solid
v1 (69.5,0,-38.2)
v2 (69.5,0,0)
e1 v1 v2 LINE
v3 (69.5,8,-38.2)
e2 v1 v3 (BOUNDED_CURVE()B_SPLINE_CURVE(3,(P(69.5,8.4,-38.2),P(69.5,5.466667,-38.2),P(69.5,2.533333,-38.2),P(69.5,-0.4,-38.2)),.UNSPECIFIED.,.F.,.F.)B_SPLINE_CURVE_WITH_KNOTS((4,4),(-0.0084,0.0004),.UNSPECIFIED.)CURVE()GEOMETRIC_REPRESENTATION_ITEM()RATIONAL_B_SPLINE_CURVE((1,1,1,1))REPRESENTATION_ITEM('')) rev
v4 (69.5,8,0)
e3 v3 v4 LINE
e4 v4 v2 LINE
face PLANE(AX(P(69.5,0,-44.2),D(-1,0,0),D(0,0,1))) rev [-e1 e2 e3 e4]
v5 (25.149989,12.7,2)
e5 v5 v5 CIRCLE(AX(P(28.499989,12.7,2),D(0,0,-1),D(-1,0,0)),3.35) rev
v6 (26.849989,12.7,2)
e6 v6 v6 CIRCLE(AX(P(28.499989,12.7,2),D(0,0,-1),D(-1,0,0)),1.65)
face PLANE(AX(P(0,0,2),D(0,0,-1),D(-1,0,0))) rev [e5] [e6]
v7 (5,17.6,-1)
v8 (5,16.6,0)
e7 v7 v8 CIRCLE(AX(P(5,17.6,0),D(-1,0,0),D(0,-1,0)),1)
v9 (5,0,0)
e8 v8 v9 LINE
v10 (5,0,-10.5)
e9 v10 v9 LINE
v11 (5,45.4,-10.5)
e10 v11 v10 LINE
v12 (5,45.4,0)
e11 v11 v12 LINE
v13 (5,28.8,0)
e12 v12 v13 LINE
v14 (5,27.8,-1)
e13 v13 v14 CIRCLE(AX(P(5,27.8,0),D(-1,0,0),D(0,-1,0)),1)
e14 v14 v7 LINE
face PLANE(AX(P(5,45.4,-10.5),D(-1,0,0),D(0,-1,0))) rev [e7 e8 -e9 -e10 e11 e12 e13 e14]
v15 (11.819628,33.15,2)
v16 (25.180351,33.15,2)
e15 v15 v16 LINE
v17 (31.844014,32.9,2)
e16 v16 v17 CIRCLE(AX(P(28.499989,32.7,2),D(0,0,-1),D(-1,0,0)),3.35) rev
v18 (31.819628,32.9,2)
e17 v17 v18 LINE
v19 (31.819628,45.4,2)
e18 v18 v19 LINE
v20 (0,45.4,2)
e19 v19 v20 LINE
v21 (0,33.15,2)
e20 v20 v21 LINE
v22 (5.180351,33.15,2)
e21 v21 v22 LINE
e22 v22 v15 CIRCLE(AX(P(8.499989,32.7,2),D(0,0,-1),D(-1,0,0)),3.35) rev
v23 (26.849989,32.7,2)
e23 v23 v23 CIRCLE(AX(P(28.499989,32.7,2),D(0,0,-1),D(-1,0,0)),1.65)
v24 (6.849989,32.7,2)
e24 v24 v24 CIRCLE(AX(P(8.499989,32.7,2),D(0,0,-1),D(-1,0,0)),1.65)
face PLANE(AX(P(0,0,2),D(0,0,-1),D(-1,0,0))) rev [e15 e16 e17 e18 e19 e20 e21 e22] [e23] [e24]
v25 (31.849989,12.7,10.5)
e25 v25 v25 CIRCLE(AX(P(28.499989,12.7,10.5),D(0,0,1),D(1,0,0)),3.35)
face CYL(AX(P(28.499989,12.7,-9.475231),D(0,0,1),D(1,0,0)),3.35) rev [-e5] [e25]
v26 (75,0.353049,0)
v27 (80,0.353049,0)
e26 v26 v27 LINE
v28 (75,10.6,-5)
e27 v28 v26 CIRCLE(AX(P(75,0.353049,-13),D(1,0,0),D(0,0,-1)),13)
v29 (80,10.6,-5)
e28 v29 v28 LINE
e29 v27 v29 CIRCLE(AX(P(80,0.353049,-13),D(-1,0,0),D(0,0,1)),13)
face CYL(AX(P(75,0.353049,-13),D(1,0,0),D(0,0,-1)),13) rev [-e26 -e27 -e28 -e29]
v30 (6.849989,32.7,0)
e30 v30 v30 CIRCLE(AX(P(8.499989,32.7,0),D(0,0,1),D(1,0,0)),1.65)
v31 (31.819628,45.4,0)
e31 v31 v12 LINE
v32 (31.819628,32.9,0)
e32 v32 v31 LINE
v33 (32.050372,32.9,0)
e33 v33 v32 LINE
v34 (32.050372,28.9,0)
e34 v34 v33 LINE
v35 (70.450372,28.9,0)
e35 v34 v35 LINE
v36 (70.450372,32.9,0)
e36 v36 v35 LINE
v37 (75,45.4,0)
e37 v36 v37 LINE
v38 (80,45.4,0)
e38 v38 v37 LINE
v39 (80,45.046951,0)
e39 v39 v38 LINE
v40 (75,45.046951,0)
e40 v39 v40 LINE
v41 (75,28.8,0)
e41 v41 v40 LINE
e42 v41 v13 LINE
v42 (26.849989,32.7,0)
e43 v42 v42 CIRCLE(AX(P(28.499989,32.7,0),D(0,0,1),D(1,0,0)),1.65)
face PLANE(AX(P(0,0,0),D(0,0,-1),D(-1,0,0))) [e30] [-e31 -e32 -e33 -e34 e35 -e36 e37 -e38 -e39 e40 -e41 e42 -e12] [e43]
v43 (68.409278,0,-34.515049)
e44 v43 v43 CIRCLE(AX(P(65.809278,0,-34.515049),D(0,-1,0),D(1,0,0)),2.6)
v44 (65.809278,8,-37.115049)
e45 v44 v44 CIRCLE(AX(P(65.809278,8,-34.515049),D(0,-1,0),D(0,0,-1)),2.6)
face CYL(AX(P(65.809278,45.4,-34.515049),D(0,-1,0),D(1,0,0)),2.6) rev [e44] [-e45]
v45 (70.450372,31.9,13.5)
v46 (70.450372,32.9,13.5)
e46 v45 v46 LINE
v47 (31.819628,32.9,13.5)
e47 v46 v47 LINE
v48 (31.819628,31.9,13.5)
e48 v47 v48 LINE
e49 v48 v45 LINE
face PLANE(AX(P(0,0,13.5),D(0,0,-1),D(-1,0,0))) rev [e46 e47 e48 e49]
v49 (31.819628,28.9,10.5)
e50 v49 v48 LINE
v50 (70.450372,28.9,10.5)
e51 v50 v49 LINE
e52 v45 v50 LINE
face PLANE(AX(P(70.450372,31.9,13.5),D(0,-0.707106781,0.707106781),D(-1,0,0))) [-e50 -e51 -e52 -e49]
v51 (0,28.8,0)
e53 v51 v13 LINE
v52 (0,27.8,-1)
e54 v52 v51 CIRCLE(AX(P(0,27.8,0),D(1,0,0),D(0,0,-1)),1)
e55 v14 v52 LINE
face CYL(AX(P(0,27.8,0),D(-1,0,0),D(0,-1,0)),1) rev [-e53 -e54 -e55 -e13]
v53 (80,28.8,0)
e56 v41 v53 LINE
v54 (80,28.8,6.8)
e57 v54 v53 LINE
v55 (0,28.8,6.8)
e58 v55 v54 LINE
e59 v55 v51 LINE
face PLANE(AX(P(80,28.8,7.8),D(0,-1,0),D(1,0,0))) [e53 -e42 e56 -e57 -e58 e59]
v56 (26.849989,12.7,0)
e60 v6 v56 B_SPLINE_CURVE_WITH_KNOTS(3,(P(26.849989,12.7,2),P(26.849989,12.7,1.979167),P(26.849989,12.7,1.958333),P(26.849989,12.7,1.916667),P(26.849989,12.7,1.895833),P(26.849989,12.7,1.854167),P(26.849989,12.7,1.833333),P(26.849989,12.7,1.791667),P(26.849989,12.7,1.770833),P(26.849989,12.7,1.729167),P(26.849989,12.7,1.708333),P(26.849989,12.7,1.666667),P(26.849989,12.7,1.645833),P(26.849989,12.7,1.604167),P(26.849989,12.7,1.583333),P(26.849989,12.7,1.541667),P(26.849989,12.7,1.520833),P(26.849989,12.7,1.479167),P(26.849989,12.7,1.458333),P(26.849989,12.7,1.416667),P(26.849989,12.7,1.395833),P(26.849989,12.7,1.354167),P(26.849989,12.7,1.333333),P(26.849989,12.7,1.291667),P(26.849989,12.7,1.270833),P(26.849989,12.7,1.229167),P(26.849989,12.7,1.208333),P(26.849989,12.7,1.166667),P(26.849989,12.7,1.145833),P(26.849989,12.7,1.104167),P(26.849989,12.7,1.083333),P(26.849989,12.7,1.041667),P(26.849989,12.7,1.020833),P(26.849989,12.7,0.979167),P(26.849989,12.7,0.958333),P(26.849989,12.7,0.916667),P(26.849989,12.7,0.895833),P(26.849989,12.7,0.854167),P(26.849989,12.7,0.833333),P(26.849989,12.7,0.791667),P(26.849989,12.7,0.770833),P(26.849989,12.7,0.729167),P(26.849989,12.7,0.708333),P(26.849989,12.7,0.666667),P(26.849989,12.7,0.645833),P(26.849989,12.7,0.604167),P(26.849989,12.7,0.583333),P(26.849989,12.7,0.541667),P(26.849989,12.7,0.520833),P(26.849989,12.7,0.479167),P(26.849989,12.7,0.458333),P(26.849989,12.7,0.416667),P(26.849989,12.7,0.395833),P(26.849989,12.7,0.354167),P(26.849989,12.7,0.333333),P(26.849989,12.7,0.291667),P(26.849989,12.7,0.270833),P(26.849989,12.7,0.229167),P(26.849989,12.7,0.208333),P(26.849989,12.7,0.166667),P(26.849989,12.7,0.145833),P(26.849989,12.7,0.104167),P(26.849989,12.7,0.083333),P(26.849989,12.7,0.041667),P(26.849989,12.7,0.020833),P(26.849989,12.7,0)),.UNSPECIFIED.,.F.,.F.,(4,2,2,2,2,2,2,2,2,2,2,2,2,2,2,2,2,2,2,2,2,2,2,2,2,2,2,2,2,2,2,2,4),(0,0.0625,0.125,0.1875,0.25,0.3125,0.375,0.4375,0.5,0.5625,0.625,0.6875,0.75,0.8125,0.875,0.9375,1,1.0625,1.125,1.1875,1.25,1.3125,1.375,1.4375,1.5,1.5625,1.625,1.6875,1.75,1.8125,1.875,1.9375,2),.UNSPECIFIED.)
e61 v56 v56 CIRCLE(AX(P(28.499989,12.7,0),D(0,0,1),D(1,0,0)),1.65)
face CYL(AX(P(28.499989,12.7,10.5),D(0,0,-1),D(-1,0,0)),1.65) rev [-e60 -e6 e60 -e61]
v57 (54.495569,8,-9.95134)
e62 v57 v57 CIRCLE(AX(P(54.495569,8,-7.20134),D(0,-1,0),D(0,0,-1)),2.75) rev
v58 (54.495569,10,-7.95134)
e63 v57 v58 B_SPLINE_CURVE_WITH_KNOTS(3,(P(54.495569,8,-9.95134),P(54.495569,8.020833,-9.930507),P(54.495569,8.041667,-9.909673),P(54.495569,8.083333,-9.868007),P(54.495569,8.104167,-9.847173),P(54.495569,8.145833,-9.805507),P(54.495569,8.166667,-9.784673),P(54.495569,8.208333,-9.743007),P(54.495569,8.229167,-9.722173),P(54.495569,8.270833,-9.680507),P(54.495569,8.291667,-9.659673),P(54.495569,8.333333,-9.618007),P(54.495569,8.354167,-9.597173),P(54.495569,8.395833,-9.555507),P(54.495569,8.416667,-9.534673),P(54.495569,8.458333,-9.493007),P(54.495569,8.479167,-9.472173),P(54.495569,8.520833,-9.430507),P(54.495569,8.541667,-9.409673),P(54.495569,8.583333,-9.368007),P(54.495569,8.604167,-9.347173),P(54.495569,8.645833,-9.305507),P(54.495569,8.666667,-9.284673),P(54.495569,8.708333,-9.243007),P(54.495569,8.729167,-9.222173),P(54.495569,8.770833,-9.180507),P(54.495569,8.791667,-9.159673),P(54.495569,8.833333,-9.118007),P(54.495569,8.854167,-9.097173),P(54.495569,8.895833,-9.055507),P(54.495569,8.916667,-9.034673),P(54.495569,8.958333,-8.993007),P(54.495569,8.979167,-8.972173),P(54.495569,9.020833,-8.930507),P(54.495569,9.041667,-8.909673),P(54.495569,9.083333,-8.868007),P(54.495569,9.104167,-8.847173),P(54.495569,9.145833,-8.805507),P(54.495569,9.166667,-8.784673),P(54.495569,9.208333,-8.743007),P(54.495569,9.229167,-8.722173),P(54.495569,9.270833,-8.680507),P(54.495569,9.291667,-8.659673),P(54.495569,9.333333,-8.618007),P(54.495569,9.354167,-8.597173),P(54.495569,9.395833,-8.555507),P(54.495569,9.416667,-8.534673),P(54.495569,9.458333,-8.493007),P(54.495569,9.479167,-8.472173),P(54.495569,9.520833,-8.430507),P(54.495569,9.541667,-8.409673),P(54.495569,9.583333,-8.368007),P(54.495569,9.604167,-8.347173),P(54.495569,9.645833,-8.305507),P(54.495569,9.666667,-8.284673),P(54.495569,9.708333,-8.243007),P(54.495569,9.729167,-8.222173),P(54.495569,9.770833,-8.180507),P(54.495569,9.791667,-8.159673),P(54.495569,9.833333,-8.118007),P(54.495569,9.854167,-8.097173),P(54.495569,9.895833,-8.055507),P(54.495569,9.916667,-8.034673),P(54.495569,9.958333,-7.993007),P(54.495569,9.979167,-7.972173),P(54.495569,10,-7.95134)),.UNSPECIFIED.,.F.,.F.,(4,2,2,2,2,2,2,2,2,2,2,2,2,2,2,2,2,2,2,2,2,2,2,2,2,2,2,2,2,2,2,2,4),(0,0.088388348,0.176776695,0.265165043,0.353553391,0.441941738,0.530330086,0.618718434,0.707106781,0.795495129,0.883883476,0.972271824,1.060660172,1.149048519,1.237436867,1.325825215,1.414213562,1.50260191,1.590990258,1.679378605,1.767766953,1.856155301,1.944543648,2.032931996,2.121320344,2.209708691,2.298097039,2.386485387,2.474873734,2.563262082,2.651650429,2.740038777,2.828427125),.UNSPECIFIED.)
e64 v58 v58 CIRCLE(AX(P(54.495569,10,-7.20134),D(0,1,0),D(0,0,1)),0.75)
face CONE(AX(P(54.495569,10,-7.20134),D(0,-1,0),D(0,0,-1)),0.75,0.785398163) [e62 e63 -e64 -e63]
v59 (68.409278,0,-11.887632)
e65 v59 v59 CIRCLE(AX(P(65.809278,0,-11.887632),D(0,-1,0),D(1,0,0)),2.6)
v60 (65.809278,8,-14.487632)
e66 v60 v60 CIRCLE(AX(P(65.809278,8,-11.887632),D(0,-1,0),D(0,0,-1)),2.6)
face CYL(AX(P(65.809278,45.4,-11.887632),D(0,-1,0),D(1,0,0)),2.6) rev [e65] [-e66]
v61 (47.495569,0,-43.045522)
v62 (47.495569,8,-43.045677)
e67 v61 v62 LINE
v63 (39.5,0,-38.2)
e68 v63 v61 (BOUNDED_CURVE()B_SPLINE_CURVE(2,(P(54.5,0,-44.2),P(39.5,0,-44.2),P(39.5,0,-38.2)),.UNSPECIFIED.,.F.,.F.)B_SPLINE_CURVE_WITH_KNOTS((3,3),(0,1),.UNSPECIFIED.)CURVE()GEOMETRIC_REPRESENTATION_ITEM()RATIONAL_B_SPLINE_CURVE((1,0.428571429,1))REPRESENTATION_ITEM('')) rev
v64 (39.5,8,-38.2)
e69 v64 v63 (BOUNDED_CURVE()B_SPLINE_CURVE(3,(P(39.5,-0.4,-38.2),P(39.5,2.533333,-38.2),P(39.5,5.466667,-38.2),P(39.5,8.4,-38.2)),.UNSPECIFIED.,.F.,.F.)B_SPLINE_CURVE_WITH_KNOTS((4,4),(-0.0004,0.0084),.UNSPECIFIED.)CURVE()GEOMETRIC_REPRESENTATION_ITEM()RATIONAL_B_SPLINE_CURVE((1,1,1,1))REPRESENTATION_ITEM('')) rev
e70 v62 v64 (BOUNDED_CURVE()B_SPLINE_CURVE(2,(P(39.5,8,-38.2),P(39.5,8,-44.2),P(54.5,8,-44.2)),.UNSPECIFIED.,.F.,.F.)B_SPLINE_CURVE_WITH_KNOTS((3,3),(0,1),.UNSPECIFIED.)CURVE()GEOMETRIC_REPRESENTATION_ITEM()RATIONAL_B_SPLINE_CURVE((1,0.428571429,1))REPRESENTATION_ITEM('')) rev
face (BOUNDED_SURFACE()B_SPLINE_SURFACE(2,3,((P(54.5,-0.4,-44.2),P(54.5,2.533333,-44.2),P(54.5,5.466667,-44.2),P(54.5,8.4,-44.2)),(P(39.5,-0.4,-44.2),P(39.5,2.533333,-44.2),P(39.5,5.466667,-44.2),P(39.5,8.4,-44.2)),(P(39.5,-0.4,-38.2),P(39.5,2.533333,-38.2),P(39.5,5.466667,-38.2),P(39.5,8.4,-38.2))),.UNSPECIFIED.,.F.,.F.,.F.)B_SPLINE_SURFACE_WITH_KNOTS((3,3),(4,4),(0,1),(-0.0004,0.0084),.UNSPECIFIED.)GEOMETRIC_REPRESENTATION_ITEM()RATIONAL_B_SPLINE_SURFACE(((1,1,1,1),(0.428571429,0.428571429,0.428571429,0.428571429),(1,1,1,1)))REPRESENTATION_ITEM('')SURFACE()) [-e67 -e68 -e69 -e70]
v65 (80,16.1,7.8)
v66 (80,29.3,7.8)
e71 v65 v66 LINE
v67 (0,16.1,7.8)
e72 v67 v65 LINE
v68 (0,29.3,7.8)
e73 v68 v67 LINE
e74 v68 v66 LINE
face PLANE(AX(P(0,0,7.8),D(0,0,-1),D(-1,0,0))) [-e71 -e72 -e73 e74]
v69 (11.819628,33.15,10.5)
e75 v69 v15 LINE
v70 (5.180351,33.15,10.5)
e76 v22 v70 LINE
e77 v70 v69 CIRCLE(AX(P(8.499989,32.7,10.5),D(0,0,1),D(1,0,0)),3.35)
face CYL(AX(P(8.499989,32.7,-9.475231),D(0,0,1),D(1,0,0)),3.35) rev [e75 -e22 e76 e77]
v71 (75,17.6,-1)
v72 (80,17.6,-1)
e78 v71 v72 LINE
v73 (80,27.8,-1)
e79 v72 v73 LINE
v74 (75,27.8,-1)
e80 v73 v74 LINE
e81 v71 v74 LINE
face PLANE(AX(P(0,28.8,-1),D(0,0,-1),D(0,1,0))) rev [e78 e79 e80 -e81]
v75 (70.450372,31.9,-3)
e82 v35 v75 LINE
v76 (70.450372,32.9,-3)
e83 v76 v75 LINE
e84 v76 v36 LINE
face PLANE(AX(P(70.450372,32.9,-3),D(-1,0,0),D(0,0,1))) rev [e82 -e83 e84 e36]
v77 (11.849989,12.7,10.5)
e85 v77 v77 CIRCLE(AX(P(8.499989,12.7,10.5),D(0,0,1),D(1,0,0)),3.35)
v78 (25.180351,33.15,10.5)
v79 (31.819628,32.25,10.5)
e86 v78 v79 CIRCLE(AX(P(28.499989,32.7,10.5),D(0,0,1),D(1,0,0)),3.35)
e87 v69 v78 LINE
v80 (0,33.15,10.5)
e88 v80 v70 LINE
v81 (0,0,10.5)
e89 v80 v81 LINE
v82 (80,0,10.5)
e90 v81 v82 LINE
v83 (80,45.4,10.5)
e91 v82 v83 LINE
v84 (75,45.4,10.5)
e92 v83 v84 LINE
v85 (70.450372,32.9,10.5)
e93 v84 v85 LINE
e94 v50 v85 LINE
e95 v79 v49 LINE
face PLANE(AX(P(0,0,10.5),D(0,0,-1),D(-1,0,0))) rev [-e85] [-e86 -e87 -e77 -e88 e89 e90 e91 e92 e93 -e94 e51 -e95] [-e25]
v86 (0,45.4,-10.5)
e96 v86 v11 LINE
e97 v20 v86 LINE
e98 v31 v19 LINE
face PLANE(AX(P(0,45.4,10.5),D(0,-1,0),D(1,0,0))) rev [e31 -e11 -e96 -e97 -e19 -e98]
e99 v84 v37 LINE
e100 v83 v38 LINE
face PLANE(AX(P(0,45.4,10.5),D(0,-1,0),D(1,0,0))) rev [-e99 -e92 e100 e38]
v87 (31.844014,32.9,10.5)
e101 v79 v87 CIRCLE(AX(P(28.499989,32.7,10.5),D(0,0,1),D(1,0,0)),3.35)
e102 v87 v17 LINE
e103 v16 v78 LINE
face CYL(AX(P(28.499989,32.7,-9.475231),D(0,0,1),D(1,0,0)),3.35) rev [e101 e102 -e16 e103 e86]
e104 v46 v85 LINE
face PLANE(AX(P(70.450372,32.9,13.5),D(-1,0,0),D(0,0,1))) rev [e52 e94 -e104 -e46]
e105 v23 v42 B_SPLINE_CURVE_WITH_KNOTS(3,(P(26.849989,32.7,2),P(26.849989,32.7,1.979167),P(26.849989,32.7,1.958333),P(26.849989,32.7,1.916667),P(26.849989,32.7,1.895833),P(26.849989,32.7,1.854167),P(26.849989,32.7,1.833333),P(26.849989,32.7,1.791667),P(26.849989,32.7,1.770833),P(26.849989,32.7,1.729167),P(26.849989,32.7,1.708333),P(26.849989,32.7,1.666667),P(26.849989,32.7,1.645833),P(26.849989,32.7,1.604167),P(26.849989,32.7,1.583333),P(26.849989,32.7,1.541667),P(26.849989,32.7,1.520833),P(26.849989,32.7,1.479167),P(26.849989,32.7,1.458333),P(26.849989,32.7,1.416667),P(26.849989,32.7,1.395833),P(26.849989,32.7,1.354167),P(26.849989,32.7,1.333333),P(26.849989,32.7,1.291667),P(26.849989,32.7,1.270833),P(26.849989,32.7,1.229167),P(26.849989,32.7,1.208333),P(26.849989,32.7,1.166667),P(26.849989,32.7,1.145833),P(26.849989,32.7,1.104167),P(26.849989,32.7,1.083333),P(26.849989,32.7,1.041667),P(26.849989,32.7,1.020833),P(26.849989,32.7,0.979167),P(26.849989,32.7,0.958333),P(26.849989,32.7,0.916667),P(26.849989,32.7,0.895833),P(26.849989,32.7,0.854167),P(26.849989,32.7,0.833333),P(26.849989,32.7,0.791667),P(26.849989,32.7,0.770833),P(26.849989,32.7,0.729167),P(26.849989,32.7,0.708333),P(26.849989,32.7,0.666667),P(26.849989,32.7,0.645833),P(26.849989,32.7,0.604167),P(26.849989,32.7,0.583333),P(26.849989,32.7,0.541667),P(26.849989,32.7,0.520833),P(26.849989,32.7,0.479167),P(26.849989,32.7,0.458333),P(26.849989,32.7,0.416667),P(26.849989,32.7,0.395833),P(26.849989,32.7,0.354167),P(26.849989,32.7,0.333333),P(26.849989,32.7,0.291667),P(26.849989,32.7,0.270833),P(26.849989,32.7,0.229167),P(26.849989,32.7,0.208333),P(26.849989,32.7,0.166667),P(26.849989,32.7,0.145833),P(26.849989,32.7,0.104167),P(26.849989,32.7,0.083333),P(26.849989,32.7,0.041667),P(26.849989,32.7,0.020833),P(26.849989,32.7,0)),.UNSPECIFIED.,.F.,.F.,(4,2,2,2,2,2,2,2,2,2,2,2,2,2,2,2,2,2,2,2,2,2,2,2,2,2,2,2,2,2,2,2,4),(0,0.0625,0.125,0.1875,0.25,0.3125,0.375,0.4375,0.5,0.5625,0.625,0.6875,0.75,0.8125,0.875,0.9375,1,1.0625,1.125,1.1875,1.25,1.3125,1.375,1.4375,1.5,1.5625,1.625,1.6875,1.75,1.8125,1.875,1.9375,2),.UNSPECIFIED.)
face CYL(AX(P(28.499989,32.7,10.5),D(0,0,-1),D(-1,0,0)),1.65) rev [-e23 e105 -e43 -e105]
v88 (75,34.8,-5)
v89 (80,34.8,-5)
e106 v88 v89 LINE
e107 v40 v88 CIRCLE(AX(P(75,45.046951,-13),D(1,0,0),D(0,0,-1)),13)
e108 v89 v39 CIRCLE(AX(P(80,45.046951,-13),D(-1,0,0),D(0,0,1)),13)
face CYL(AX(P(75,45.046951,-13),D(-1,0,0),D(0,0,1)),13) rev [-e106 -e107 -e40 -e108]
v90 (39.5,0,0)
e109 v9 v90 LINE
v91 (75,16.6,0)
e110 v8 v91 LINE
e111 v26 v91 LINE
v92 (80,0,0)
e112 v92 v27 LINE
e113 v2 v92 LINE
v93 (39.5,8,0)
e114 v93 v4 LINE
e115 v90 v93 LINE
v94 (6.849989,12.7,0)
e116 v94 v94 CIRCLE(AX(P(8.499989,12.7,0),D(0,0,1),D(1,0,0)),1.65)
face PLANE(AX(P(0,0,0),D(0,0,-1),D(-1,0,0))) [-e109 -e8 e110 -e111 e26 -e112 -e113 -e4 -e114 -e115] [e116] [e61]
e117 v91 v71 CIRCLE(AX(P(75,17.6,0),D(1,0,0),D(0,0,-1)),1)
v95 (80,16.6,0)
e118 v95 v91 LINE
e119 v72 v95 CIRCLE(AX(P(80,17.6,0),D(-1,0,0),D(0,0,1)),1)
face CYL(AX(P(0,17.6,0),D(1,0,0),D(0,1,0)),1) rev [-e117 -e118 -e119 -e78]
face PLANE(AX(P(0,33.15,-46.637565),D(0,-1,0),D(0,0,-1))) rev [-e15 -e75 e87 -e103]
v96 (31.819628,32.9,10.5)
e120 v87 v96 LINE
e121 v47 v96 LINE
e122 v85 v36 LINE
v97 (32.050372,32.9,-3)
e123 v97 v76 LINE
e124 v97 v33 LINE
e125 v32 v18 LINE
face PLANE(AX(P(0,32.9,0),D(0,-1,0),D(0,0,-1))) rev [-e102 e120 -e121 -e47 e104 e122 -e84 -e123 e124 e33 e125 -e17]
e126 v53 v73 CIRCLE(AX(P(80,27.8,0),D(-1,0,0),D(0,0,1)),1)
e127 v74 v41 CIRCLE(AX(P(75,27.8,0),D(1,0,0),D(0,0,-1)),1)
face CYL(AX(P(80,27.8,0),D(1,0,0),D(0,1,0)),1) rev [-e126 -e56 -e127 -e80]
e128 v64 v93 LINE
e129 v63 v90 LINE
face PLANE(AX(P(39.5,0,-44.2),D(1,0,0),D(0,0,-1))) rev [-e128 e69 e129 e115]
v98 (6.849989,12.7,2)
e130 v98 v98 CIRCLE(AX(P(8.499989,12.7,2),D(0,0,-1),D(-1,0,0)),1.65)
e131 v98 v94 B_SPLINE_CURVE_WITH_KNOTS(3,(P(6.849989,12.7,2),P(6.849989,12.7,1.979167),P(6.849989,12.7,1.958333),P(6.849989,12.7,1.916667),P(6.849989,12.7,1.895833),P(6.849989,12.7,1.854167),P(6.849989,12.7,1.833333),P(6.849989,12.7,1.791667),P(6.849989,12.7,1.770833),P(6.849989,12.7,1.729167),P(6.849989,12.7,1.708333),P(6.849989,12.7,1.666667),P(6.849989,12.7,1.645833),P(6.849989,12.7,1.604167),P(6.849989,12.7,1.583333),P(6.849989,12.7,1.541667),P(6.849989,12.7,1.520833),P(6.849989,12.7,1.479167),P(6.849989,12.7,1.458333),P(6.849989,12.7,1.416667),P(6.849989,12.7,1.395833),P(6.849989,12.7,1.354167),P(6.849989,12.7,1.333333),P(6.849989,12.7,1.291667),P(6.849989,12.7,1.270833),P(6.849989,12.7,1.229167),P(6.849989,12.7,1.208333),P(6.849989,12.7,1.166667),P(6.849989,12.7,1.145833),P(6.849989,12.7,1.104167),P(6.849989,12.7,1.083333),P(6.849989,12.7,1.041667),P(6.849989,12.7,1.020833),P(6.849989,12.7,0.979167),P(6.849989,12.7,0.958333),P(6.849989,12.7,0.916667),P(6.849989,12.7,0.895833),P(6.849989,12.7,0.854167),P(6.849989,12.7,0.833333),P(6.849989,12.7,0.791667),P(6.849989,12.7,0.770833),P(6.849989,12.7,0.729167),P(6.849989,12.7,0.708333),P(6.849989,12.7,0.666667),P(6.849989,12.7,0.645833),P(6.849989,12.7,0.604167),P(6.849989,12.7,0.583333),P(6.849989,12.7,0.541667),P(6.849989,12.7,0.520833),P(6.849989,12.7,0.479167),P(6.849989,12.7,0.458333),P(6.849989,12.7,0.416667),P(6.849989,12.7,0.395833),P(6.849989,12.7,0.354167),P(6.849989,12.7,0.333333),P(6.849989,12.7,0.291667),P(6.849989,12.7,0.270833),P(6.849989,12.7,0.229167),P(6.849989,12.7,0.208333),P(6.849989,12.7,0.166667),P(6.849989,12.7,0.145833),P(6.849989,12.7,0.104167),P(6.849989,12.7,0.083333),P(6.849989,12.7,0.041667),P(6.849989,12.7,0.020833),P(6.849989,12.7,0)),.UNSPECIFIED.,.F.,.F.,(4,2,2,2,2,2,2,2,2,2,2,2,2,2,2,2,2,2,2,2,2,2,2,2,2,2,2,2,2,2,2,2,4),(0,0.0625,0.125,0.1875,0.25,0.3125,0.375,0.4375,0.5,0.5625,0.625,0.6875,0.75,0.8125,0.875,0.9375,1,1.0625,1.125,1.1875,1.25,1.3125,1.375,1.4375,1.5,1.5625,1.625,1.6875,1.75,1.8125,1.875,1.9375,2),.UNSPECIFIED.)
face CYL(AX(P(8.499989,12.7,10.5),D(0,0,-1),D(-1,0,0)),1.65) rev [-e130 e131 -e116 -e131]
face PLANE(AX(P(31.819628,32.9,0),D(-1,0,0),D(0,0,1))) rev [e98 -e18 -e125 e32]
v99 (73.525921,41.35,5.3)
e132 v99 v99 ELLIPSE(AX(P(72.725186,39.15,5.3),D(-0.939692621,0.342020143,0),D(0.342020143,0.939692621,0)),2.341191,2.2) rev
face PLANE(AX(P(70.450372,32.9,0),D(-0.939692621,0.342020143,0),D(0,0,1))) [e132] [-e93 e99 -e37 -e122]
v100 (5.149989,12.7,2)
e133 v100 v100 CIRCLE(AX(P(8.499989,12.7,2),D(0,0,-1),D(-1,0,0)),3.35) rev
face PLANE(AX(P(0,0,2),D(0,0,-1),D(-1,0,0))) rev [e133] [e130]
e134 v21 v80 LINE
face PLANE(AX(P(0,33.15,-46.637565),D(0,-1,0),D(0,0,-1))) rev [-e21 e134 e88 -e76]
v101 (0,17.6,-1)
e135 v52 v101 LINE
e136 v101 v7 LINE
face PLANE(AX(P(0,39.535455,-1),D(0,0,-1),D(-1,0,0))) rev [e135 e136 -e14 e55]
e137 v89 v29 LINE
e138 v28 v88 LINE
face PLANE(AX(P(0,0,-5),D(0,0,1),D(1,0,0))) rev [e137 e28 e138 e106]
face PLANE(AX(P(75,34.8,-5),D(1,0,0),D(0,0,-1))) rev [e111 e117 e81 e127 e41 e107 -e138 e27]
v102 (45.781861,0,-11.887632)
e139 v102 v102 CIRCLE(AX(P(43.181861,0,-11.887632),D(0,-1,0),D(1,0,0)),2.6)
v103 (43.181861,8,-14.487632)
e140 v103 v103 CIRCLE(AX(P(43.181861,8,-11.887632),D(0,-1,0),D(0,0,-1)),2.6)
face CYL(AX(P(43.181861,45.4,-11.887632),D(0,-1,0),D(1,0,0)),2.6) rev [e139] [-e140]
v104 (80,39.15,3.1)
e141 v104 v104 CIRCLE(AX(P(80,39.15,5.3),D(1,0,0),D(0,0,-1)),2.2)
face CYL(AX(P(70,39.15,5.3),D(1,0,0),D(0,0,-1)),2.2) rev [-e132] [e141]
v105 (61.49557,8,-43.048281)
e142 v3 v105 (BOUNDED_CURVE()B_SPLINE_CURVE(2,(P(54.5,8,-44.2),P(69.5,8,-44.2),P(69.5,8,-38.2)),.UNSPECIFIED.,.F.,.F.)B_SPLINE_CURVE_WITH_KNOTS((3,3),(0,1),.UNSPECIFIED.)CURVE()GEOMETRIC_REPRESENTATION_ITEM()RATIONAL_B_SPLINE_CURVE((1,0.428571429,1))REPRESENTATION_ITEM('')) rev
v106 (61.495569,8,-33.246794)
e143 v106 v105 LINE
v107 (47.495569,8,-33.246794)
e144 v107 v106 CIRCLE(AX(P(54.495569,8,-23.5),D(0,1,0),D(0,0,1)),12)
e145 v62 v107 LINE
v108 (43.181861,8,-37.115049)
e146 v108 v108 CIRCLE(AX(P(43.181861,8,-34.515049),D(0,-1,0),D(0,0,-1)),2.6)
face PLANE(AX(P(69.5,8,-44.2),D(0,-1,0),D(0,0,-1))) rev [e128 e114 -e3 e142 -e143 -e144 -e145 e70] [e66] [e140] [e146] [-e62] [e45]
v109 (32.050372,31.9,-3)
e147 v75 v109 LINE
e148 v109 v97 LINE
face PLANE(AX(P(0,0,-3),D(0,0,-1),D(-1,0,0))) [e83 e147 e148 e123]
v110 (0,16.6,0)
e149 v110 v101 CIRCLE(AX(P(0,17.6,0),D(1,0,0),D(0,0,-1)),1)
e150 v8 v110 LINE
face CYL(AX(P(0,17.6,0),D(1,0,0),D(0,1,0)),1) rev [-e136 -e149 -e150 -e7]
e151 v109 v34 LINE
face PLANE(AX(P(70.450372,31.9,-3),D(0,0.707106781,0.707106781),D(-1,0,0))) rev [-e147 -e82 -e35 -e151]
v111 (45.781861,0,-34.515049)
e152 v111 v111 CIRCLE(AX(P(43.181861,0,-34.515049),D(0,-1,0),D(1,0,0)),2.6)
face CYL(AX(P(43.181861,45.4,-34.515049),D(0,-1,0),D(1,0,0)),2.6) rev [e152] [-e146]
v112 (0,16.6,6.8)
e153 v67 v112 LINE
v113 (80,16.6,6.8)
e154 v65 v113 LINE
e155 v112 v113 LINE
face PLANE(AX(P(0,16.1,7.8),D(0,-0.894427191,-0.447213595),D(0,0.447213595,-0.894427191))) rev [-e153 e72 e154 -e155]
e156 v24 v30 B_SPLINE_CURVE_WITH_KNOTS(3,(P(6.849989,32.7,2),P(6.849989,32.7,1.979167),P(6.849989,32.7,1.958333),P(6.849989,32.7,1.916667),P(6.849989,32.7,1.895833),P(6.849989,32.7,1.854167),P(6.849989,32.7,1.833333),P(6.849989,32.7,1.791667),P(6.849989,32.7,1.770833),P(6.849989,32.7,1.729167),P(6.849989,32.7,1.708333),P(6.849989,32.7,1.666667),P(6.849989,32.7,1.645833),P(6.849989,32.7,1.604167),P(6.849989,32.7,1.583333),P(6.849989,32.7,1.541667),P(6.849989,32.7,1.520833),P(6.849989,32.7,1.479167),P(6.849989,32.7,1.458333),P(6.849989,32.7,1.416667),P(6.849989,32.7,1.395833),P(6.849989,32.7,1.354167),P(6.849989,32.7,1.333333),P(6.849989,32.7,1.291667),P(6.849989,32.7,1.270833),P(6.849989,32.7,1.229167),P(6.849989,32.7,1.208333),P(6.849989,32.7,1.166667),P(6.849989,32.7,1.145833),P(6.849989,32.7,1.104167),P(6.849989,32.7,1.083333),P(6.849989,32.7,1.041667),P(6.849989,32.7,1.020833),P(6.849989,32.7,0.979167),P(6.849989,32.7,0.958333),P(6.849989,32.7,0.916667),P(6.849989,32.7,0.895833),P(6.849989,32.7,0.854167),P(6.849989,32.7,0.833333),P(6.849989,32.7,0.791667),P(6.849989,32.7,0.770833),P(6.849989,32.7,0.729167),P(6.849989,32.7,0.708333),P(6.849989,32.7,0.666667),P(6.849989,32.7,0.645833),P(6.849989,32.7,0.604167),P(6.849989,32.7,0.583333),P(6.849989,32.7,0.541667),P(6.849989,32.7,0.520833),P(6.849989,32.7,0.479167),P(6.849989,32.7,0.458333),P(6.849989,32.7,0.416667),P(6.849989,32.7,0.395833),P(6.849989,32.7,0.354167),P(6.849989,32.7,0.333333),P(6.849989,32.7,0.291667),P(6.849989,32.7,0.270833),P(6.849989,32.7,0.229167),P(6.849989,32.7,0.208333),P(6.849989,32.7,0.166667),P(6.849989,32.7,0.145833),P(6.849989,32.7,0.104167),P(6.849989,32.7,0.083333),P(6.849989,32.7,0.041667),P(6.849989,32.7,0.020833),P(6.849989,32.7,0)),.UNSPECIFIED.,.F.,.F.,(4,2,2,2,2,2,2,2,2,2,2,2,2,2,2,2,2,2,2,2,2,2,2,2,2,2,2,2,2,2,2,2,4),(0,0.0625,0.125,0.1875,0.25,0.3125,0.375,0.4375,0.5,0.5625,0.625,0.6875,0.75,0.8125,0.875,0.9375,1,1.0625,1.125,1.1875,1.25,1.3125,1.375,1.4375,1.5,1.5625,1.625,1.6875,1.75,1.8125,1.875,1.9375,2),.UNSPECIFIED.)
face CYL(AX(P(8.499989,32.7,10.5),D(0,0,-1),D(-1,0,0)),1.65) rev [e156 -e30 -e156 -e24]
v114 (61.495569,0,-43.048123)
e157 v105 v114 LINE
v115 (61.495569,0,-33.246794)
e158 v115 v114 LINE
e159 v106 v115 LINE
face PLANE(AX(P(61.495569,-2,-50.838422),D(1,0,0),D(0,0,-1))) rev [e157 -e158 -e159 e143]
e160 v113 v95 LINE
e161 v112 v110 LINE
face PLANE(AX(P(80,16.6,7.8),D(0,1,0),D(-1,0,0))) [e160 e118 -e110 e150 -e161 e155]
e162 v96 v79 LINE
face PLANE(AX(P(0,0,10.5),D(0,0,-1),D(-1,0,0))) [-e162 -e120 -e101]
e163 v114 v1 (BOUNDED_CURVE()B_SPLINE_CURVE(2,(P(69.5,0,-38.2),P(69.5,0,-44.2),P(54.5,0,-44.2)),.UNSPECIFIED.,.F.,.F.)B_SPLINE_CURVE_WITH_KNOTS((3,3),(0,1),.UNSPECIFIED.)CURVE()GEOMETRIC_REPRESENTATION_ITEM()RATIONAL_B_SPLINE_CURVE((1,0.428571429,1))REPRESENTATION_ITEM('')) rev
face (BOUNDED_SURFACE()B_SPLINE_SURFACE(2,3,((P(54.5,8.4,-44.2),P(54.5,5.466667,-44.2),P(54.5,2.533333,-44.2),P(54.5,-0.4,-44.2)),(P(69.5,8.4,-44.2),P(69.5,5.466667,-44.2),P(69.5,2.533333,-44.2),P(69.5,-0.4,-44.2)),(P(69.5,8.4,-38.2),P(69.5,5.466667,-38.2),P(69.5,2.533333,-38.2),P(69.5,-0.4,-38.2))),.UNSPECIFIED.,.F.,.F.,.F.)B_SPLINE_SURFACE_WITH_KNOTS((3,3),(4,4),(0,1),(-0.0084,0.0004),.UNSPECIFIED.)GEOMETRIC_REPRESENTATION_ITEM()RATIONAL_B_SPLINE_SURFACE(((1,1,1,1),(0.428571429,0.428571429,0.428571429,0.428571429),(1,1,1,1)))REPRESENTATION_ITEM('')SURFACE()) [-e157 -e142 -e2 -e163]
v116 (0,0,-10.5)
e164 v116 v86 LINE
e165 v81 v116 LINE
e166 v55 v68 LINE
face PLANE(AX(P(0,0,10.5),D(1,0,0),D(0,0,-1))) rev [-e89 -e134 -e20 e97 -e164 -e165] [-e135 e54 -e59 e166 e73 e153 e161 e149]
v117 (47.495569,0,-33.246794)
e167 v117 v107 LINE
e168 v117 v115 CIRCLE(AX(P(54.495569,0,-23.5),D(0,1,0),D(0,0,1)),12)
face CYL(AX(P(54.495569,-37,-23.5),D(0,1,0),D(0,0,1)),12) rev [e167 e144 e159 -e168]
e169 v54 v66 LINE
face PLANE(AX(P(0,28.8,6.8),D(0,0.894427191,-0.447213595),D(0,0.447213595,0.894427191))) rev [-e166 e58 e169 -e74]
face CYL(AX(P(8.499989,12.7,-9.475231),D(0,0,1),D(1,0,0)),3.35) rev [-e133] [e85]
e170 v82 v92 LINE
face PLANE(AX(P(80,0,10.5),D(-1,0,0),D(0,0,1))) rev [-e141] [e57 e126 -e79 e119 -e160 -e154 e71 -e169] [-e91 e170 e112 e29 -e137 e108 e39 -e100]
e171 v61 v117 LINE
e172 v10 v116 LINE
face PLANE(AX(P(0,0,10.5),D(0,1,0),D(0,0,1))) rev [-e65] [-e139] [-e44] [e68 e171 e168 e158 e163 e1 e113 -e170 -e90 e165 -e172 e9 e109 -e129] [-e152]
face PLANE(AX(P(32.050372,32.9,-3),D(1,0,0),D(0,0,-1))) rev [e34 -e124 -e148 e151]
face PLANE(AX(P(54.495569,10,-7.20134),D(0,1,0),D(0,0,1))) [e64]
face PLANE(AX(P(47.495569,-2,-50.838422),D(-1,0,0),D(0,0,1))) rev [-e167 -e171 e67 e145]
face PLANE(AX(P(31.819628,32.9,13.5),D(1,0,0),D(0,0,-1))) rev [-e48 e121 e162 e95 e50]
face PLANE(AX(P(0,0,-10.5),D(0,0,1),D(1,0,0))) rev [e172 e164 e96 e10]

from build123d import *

# Parameters (mm, degrees)
SKETCH1_W               = 80
SKETCH1_H               = 45.4
SKETCH1_R               = 1.65
BOSS_EXTRUDE1_DEPTH     = 10.5
SKETCH2_W               = 5
SKETCH2_H               = 45.4
BOSS_EXTRUDE2_DEPTH     = 10.5
CUT_EXTRUDE1_DEPTH      = 7.8
CUT_EXTRUDE1_DEPTH_BACK = 93.58190968
SKETCH3_W               = 80
SKETCH3_H               = 12.2
SKETCH4_W               = 30
SKETCH4_H               = 8
BOSS_EXTRUDE3_DEPTH     = 44.2
SKETCH5_R               = 12
CUT_EXTRUDE2_DEPTH      = 45
CUT_EXTRUDE3_DEPTH      = 96.828388278
CUT_EXTRUDE3_DEPTH_BACK = 96.828388278
SKETCH6_R               = 2.6
FILLET1_SIZE            = 6
FILLET1_SIZE_2          = 15
SKETCH8_R               = 3.35
CUT_EXTRUDE5_DEPTH      = 8.5
SKETCH12_W              = 45
SKETCH12_H              = 12.25
CUT_EXTRUDE8_DEPTH      = 8.5
SKETCH13_W              = 14
SKETCH13_H              = 23.274164218
CUT_EXTRUDE10_DEPTH     = 10
SKETCH15_R              = 2.75
BOSS_EXTRUDE6_DEPTH     = 2
SKETCH16_W              = 43.180372268
SKETCH16_H              = 10.5
CUT_EXTRUDE11_DEPTH     = 12.5
CHAMFER2_SIZE2          = 12.5
CHAMFER2_SIZE           = 4.549627928
SKETCH17_R              = 2.2
CUT_EXTRUDE12_DEPTH     = 10
CUT_EXTRUDE13_DEPTH     = 102.559280367
SKETCH19_W              = 5
SKETCH19_H              = 24.2
BOSS_EXTRUDE7_DEPTH     = 5
SKETCH20_W              = 1
SKETCH20_H              = 12.2
CUT_EXTRUDE14_DEPTH     = 102.559280367
SKETCH21_W              = 5
SKETCH21_H              = 9.5
BOSS_EXTRUDE8_DEPTH     = 12.2
FILLET2_R               = 1
FILLET3_R               = 13
CHAMFER1_SIZE           = 2
SKETCH22_W              = 38.63074434
SKETCH22_H              = 1
BOSS_EXTRUDE9_DEPTH     = 3
SKETCH23_W              = 38.4
SKETCH23_H              = 1
BOSS_EXTRUDE10_DEPTH    = 3
CHAMFER3_SIZE           = 3


# Some blends are built 0.0001 mm under size
with BuildPart() as part:
    # Sketch1 → Boss-Extrude1 (new body)
    with BuildSketch(Plane.XY):
        with Locations((40, 22.7)):
            Rectangle(SKETCH1_W, SKETCH1_H)
        with Locations(Location((8.499989197, 32.7, 0), (0, 0, 180))):
            Circle(SKETCH1_R, mode=Mode.SUBTRACT)
        with Locations(Location((28.499989197, 32.7, 0), (0, 0, 180))):
            Circle(SKETCH1_R, mode=Mode.SUBTRACT)
        with Locations(Location((28.499989197, 12.7, 0), (0, 0, 180))):
            Circle(SKETCH1_R, mode=Mode.SUBTRACT)
        with Locations(Location((8.499989197, 12.7, 0), (0, 0, 180))):
            Circle(SKETCH1_R, mode=Mode.SUBTRACT)
    extrude(amount=BOSS_EXTRUDE1_DEPTH)

    # Sketch2 → Boss-Extrude2 (add)
    with BuildSketch(Plane(origin=(0, 0, 0), x_dir=(-1, 0, 0), z_dir=(0, 0, -1))):
        with Locations((-2.5, 22.7)):
            Rectangle(SKETCH2_W, SKETCH2_H)
    extrude(amount=BOSS_EXTRUDE2_DEPTH)

    # Sketch3 → Cut-Extrude1 (cut, two sides: drawn at the far end of the back side and taken through both)
    with BuildSketch(Plane.XY.offset(-CUT_EXTRUDE1_DEPTH_BACK)):
        with Locations((40, 22.7)):
            Rectangle(SKETCH3_W, SKETCH3_H)
    extrude(amount=CUT_EXTRUDE1_DEPTH + CUT_EXTRUDE1_DEPTH_BACK, mode=Mode.SUBTRACT)

    # Sketch4 → Boss-Extrude3 (add)
    with BuildSketch(Plane(origin=(0, 0, 0), x_dir=(-1, 0, 0), z_dir=(0, 0, -1))):
        with Locations((-54.5, 4)):
            Rectangle(SKETCH4_W, SKETCH4_H)
    extrude(amount=BOSS_EXTRUDE3_DEPTH)

    # Sketch5 → Cut-Extrude2 (cut)
    with BuildSketch(Plane(origin=(0, 8, 0), x_dir=(1, 0, 0), z_dir=(0, 1, 0))):
        with Locations(Location((54.495569327, 23.5, 0), (0, 0, 270))):
            Circle(SKETCH5_R)
    extrude(amount=-CUT_EXTRUDE2_DEPTH, mode=Mode.SUBTRACT)

    # Sketch6 → Cut-Extrude3 (cut, two sides: drawn at the far end of the back side and taken through both)
    with BuildSketch(Plane.XZ.offset(-16.6).offset(-CUT_EXTRUDE3_DEPTH_BACK)):
        with Locations((54.495569327, -39.201340103)):
            Circle(SKETCH6_R)
        with Locations((65.809277826, -34.515048602)):
            Circle(SKETCH6_R)
        with Locations((43.181860828, -34.515048602)):
            Circle(SKETCH6_R)
        with Locations((43.181860828, -11.887631605)):
            Circle(SKETCH6_R)
        with Locations((65.809277826, -11.887631605)):
            Circle(SKETCH6_R)
    extrude(amount=CUT_EXTRUDE3_DEPTH + CUT_EXTRUDE3_DEPTH_BACK, mode=Mode.SUBTRACT)

    # Fillet1
    # a fillet whose section is not a circle: 15, 6 mm, written as the material it takes off along each edge
    with BuildSketch(Plane(origin=(39.5, -37.5, -44.2), x_dir=(0, 0, 1), z_dir=(0, 1, 0)), Plane(origin=(69.5, 45.5, -44.2), x_dir=(0, 0, 1), z_dir=(0, -1, 0))) as fillet1_piece_1:
        with BuildLine():
            Bezier((FILLET1_SIZE, 0), (0, 0), (0, FILLET1_SIZE_2), weights=[1, 0.428571429, 1])
            Line((0, FILLET1_SIZE_2), (0, 0))
            Line((0, 0), (FILLET1_SIZE, 0))
        make_face()
    extrude(amount=83, mode=Mode.SUBTRACT)

    # Sketch8 → Cut-Extrude5 (cut)
    with BuildSketch(Plane.XY.offset(10.5)):
        with Locations((8.499989197, 32.7)):
            Circle(SKETCH8_R)
        with Locations((28.499989197, 32.7)):
            Circle(SKETCH8_R)
        with Locations((8.499989197, 12.7)):
            Circle(SKETCH8_R)
        with Locations((28.499989197, 12.7)):
            Circle(SKETCH8_R)
    extrude(amount=-CUT_EXTRUDE5_DEPTH, mode=Mode.SUBTRACT)

    # Sketch12 → Cut-Extrude8 (cut)
    with BuildSketch(Plane.XY.offset(10.5)):
        with Locations((22.5, 39.275)):
            Rectangle(SKETCH12_W, SKETCH12_H)
    extrude(amount=-CUT_EXTRUDE8_DEPTH, mode=Mode.SUBTRACT)

    # Sketch13 → Cut-Extrude10 (cut)
    with BuildSketch(Plane(origin=(0, 8, 0), x_dir=(1, 0, 0), z_dir=(0, 1, 0))):
        with Locations((54.495569327, 39.201340103)):
            Rectangle(SKETCH13_W, SKETCH13_H)
    extrude(amount=-CUT_EXTRUDE10_DEPTH, mode=Mode.SUBTRACT)

    # Sketch15 → Boss-Extrude6 (add)
    with BuildSketch(Plane(origin=(0, 8, 0), x_dir=(1, 0, 0), z_dir=(0, 1, 0))):
        with Locations(Location((54.495569327, 7.201340104, 0), (0, 0, 90))):
            Circle(SKETCH15_R)
    extrude(amount=BOSS_EXTRUDE6_DEPTH)

    # Sketch16 → Cut-Extrude11 (cut)
    with BuildSketch(Plane(origin=(0, 45.4, 0), x_dir=(1, 0, 0), z_dir=(0, 1, 0))):
        with Locations((53.409813866, -5.25)):
            Rectangle(SKETCH16_W, SKETCH16_H)
    extrude(amount=-CUT_EXTRUDE11_DEPTH, mode=Mode.SUBTRACT)

    # Chamfer2
    chamfer2_edges = [part.edges().sort_by_distance(p)[0] for p in [
        (75, 32.9, 5.25),
    ]]
    chamfer2_side = [part.faces().sort_by_distance(p)[0] for p in [
        (74.909007441, 32.9, 5.25),
    ]]
    chamfer(chamfer2_edges, length=CHAMFER2_SIZE - 0.0001, length2=CHAMFER2_SIZE2 - 0.0001, reference=chamfer2_side[0])  # a hair under: the kernel refuses the full size

    # Sketch17 → Cut-Extrude12 (cut)
    with BuildSketch(Plane(origin=(80, 0, 0), x_dir=(0, 0, -1), z_dir=(1, 0, 0))):
        with Locations((-5.3, 39.15)):
            Circle(SKETCH17_R)
    extrude(amount=-CUT_EXTRUDE12_DEPTH, mode=Mode.SUBTRACT)

    # Sketch18 → Cut-Extrude13 (cut, through all)
    with BuildSketch(Plane(origin=(80, 0, 0), x_dir=(0, 0, -1), z_dir=(1, 0, 0))):
        Polygon((-7.8, 28.8), (-6.8, 28.8), (-7.8, 29.3), align=None)
        Polygon((-7.8, 16.6), (-7.8, 16.1), (-6.8, 16.6), align=None)
    extrude(amount=-CUT_EXTRUDE13_DEPTH, mode=Mode.SUBTRACT)

    # Sketch19 → Boss-Extrude7 (add)
    with BuildSketch(Plane(origin=(0, 0, 0), x_dir=(-1, 0, 0), z_dir=(0, 0, -1))):
        with Locations((-77.5, 22.7)):
            Rectangle(SKETCH19_W, SKETCH19_H)
    extrude(amount=BOSS_EXTRUDE7_DEPTH)

    # Sketch20 → Cut-Extrude14 (cut, through all)
    with BuildSketch(Plane(origin=(80, 0, 0), x_dir=(0, 0, -1), z_dir=(1, 0, 0))):
        with Locations((0.5, 22.7)):
            Rectangle(SKETCH20_W, SKETCH20_H)
    extrude(amount=-CUT_EXTRUDE14_DEPTH, mode=Mode.SUBTRACT)

    # Sketch21 → Boss-Extrude8 (add)
    with BuildSketch(Plane(origin=(0, 16.6, 0), x_dir=(1, 0, 0), z_dir=(0, 1, 0))):
        with Locations((2.5, 5.75)):
            Rectangle(SKETCH21_W, SKETCH21_H)
    extrude(amount=BOSS_EXTRUDE8_DEPTH)

    # Fillet2
    fillet2_edges = [part.edges().sort_by_distance(p)[0] for p in [
        (77.5, 16.6, -1),
        (77.5, 28.8, -1),
        (2.5, 16.6, -1),
        (2.5, 28.8, -1),
    ]]
    fillet(fillet2_edges, radius=FILLET2_R)

    # Fillet3
    # the kernel refuses this fillet: 13 mm, written as the material it adds along each edge
    with BuildSketch(Plane(origin=(80, 10.6, 0), x_dir=(0, -1, 0), z_dir=(-1, 0, 0)), Plane(origin=(75, 34.8, 0), x_dir=(0, 1, 0), z_dir=(1, 0, 0))) as fillet3_piece_1:
        with BuildLine():
            CenterArc((10.246950766, -13), FILLET3_R, 90, 52.020127555)
            Line((0, -5), (0, 0))
            Line((0, 0), (10.246950766, 0))
        make_face()
    extrude(amount=5)

    # Chamfer1
    chamfer1_edges = [part.edges().sort_by_distance(p)[0] for p in [
        (54.495569327, 10, -4.451340104),
    ]]
    chamfer(chamfer1_edges, length=CHAMFER1_SIZE - 0.0001)  # a hair under: the kernel refuses the full size

    # Sketch22 → Boss-Extrude9 (add)
    with BuildSketch(Plane.XY.offset(10.5)):
        with Locations((51.134999902, 32.4)):
            Rectangle(SKETCH22_W, SKETCH22_H)
    extrude(amount=BOSS_EXTRUDE9_DEPTH)

    # Sketch23 → Boss-Extrude10 (add)
    with BuildSketch(Plane(origin=(0, 0, 0), x_dir=(-1, 0, 0), z_dir=(0, 0, -1))):
        with Locations((-51.250372072, 32.4)):
            Rectangle(SKETCH23_W, SKETCH23_H)
    extrude(amount=BOSS_EXTRUDE10_DEPTH)

    # Chamfer3
    chamfer3_edges = [part.edges().sort_by_distance(p)[0] for p in [
        (51.134999902, 31.9, 10.5),
        (51.250372072, 31.9, 0),
    ]]
    chamfer(chamfer3_edges, length=CHAMFER3_SIZE - 0.0001)  # a hair under: the kernel refuses the full size


solid = part.part
